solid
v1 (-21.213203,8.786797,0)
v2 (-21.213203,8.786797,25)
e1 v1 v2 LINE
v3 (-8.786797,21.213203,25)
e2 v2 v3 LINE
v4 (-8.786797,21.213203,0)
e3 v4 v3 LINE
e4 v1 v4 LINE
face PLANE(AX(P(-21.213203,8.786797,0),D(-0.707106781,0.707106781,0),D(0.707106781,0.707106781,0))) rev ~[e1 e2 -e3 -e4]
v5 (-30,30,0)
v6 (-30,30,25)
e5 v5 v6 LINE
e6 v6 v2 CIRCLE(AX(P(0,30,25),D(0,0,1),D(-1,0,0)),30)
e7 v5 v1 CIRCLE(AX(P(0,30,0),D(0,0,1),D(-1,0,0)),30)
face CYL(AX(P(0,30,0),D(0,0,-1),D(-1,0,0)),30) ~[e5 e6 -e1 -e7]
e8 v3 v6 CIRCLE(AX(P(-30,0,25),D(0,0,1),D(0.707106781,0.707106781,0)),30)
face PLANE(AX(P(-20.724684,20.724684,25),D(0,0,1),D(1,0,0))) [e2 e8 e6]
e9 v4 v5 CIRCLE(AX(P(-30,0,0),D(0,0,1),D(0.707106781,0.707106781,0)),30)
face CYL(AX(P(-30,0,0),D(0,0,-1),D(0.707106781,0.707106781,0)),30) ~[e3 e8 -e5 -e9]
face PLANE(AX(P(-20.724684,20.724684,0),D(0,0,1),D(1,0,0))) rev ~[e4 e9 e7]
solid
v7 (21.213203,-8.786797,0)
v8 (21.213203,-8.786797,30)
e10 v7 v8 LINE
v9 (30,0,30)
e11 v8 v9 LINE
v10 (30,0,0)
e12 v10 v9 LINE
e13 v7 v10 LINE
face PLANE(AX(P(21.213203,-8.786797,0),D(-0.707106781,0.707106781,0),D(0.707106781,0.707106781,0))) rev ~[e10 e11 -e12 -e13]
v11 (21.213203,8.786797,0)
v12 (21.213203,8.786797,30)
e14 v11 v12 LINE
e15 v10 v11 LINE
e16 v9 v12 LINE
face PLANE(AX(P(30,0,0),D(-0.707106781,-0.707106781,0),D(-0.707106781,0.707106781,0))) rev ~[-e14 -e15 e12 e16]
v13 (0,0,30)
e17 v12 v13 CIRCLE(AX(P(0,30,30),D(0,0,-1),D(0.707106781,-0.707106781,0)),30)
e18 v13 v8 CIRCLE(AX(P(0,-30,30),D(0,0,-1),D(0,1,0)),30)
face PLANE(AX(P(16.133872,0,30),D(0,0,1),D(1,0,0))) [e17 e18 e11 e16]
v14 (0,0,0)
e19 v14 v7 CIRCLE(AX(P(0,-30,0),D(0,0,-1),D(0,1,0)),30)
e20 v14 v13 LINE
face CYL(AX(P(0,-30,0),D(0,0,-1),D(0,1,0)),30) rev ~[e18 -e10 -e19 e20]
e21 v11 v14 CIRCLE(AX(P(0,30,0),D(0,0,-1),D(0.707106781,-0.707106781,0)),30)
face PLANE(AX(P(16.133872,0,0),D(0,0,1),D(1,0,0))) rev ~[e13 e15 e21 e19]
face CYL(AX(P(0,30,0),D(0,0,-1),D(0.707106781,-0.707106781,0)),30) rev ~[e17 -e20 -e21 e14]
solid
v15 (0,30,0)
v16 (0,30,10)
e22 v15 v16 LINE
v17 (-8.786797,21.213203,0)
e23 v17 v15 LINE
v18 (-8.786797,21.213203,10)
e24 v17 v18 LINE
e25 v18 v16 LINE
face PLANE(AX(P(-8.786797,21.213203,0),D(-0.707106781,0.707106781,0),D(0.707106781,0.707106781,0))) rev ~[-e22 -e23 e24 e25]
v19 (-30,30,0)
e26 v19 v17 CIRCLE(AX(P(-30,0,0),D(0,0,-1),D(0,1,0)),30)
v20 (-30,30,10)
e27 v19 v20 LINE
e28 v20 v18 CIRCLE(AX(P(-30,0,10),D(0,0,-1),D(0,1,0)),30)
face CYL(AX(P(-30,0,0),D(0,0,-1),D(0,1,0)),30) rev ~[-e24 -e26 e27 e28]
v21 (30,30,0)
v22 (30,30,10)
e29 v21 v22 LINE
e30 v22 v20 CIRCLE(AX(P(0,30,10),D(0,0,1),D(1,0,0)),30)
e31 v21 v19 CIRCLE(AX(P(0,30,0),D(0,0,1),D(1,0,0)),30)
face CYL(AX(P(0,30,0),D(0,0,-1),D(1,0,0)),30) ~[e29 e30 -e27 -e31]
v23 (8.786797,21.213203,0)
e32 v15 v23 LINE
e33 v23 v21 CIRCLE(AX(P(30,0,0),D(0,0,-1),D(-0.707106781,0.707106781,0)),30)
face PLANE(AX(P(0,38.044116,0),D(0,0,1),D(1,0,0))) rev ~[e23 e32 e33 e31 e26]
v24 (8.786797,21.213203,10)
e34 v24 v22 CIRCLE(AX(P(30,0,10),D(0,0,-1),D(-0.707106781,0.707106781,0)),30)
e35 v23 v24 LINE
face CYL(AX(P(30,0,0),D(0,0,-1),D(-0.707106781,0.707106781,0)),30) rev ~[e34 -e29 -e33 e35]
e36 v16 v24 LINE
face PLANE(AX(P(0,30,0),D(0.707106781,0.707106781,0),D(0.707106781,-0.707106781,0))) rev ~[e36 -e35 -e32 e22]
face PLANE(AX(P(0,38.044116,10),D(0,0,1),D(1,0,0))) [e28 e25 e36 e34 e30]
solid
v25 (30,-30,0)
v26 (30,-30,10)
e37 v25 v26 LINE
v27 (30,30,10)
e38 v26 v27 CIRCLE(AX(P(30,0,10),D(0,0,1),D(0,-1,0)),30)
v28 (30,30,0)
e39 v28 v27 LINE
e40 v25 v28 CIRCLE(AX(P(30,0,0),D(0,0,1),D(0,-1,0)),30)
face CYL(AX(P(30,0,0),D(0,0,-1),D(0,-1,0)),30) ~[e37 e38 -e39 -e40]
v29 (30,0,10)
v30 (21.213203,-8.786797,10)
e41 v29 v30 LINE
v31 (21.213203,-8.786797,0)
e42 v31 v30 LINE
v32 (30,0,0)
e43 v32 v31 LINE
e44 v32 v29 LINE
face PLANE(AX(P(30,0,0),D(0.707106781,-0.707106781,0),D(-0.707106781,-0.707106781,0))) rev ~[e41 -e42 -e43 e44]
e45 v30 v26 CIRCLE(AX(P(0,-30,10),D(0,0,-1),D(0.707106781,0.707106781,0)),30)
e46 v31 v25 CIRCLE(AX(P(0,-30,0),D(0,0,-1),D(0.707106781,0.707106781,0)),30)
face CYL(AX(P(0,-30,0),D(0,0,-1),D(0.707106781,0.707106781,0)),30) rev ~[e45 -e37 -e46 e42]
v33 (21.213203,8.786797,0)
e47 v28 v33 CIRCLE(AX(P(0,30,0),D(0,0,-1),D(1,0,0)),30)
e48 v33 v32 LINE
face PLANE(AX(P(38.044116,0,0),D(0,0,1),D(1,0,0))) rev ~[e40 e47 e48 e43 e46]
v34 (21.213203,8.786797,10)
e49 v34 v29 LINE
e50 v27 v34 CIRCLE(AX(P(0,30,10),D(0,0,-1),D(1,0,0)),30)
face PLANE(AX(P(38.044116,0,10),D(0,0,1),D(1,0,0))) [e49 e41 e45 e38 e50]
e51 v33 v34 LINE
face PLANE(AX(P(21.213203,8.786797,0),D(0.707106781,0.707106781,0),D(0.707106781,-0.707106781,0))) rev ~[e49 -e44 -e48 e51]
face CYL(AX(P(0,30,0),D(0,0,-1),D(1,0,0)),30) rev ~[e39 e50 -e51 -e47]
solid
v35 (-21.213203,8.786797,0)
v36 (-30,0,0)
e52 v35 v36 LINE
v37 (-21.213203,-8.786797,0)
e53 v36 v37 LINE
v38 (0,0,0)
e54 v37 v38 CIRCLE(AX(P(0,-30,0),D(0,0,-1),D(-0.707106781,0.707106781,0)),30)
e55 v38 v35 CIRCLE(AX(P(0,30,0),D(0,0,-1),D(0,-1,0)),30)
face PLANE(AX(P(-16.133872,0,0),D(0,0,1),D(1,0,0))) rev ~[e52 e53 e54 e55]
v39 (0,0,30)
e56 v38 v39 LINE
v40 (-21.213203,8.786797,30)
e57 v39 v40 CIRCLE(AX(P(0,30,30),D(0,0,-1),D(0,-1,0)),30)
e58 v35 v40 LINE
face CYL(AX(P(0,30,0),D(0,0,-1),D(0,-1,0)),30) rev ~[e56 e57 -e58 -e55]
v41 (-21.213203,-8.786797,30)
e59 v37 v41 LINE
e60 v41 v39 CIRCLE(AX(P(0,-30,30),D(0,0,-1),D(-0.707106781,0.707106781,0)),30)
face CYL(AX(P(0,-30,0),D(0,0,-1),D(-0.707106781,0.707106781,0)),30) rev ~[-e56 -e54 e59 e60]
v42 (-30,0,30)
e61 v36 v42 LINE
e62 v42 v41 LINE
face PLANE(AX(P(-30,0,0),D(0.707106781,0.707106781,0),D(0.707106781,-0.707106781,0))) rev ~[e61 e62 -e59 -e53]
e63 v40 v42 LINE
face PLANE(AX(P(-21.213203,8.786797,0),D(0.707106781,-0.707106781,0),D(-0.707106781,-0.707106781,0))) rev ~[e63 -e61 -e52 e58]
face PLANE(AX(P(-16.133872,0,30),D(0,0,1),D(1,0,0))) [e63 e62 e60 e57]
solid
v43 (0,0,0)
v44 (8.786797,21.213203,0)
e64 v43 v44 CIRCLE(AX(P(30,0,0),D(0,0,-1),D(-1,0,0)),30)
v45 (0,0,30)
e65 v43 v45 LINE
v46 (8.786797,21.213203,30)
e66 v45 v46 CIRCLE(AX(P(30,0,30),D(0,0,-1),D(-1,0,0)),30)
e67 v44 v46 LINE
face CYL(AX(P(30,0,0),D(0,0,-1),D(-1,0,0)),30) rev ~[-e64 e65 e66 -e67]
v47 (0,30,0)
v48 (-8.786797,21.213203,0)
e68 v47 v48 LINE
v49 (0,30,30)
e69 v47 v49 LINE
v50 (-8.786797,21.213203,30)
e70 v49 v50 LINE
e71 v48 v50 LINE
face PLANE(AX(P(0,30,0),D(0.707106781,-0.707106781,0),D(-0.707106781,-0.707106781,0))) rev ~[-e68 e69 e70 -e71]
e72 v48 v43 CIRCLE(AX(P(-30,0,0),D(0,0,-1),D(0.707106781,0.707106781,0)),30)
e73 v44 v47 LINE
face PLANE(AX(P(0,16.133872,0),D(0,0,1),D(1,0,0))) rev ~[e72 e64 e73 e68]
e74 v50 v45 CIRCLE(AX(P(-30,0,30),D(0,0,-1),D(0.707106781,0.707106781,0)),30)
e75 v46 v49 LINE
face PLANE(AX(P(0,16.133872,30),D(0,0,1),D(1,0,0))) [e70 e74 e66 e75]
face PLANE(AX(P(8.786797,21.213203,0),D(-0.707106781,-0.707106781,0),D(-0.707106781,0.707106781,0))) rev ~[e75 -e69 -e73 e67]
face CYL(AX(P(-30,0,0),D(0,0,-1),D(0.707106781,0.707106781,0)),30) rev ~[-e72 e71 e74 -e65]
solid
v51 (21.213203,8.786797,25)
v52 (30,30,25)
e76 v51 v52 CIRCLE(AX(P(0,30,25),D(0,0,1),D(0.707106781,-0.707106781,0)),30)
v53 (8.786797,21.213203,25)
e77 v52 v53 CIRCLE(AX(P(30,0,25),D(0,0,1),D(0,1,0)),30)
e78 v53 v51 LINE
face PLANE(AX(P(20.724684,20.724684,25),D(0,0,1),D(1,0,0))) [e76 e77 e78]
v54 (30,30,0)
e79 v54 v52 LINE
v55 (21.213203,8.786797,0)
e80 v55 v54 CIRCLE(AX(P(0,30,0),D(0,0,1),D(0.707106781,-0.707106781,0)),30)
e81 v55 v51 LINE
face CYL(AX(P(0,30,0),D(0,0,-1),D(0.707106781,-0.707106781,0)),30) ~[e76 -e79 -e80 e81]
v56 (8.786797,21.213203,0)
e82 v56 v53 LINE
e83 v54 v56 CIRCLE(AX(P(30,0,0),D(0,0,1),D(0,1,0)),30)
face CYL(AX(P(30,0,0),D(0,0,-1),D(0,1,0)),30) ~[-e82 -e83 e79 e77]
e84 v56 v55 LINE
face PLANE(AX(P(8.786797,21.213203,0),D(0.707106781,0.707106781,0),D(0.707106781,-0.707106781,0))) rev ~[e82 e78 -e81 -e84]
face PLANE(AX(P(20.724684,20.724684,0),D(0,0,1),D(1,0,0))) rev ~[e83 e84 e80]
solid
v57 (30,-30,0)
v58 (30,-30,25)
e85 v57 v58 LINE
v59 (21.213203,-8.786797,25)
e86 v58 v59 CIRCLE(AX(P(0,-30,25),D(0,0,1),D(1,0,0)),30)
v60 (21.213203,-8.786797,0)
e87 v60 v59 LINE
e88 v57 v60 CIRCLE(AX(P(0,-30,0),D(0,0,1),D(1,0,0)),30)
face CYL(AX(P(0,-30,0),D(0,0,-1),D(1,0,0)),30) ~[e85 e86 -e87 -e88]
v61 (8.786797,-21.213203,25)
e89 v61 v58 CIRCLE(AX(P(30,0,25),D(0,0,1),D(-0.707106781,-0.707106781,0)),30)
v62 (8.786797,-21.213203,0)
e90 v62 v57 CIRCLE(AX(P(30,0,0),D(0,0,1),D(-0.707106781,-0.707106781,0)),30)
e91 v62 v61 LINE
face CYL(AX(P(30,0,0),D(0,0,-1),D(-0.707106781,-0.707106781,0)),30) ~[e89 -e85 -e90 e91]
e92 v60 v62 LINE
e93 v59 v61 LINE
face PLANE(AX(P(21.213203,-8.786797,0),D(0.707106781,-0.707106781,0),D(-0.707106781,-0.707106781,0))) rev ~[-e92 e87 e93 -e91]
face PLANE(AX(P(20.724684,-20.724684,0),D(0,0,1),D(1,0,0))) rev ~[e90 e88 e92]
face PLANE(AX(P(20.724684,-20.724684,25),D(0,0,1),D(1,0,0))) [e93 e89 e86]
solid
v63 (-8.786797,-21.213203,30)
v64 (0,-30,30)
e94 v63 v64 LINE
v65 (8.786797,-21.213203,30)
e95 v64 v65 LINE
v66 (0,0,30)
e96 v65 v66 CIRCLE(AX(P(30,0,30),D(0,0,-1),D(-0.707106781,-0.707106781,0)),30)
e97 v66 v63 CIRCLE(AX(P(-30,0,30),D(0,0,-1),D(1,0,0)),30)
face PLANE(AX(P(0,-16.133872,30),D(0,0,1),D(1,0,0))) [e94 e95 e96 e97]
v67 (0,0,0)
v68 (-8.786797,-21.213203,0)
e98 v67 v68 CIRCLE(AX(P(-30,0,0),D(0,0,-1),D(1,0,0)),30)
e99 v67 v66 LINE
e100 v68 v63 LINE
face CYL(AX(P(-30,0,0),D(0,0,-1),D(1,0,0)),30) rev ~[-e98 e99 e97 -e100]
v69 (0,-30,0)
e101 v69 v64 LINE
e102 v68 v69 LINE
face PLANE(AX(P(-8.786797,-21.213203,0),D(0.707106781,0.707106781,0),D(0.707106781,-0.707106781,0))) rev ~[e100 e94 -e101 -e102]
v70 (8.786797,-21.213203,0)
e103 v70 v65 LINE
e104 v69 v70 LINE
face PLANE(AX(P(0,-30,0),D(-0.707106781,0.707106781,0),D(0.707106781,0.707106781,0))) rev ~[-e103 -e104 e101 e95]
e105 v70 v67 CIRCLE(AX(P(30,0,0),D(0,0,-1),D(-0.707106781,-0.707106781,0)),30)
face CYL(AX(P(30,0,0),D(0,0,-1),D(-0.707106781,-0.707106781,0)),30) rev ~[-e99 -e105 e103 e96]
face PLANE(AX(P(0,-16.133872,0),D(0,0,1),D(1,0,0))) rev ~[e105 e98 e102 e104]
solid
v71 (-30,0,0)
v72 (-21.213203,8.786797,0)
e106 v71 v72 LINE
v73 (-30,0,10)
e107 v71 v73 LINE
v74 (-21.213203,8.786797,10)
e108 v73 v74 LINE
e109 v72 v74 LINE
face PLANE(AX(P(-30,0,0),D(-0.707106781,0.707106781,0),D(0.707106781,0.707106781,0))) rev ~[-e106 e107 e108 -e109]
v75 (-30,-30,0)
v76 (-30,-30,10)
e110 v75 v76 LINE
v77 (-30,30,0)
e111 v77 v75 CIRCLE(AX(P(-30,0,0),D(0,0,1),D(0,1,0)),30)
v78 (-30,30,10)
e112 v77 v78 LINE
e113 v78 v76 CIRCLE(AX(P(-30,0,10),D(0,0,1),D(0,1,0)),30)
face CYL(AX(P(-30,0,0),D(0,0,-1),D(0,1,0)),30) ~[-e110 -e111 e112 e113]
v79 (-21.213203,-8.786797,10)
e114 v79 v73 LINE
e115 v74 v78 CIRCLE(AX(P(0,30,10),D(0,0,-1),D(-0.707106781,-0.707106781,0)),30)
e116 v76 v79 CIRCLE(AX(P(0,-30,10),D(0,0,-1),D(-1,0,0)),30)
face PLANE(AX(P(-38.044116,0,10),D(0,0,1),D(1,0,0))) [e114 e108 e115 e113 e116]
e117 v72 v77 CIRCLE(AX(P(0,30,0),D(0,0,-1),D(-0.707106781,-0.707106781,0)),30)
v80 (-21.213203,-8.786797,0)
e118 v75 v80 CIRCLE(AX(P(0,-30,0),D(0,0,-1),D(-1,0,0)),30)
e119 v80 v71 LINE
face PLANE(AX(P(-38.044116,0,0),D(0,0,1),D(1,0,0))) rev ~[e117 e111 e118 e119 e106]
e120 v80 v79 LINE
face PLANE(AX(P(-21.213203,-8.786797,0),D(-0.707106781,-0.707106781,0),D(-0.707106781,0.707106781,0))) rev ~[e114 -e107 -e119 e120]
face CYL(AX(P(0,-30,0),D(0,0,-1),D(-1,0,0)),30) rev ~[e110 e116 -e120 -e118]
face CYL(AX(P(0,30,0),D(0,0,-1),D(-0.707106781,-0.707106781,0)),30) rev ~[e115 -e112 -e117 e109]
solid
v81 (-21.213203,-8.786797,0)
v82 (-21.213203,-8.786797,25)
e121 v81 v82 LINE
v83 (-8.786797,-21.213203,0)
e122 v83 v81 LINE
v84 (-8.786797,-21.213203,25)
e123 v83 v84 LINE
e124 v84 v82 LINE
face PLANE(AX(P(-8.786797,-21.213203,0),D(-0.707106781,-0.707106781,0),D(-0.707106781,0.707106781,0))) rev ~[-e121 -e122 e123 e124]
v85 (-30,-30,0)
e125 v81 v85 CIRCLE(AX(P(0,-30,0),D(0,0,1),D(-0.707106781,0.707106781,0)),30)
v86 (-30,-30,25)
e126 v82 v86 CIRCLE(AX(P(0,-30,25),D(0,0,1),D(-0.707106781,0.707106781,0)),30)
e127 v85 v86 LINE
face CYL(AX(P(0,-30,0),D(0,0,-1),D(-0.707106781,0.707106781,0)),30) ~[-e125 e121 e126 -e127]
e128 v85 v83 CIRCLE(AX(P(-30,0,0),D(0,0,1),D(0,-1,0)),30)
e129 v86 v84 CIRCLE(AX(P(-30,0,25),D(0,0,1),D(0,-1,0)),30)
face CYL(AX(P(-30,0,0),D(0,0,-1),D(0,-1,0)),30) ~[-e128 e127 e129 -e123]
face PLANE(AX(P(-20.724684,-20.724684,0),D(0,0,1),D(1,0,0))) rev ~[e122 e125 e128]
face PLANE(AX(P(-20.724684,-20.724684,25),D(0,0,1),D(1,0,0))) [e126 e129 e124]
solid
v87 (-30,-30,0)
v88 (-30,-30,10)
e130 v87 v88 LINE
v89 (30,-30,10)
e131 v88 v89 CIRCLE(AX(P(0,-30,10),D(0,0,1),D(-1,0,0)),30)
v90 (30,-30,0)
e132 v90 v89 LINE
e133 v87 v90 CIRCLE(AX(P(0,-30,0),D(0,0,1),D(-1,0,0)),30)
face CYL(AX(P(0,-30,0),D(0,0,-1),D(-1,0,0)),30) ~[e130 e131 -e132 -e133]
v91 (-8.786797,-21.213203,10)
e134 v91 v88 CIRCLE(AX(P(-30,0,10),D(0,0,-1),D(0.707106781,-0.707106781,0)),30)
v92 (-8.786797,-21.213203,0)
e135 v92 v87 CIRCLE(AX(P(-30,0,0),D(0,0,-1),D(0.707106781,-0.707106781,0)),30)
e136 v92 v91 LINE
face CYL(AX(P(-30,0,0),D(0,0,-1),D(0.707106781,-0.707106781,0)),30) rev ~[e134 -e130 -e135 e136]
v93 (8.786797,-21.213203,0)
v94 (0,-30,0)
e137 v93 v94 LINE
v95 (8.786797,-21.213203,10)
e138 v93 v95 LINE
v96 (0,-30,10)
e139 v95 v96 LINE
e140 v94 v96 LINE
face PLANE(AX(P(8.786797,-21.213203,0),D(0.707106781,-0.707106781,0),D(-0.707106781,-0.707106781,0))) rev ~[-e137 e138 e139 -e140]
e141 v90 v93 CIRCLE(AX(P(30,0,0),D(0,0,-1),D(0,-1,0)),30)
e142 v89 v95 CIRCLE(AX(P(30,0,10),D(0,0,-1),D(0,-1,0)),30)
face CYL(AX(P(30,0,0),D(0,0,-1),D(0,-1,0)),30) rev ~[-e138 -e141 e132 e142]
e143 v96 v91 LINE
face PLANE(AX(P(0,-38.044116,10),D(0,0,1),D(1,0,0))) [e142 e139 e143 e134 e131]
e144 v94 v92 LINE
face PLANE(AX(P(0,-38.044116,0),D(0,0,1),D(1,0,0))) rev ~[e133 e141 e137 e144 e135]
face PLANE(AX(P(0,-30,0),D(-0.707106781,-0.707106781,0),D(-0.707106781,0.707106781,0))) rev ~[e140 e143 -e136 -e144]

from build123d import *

# Parameters (mm, degrees)
F1_DEPTH = 25
F2_DEPTH = 10
F3_DEPTH = 30


with BuildPart() as f1:
    # F0 (on Top) → F1 (new body)
    with BuildSketch(Plane.XY):
        with BuildLine():
            ThreePointArc((21.2132034356, 8.7867965644), (27.7163859753, 18.519497029), (30, 30))
            ThreePointArc((30, 30), (18.519497029, 27.7163859753), (8.7867965644, 21.2132034356))
            Line((8.7867965644, 21.2132034356), (21.2132034356, 8.7867965644))
        make_face()
    extrude(amount=F1_DEPTH)


with BuildPart() as f1b:
    # F0 (on Top) → F1, piece 2 (new body)
    with BuildSketch(Plane.XY):
        with BuildLine():
            ThreePointArc((8.7867965644, -21.2132034356), (18.519497029, -27.7163859753), (30, -30))
            ThreePointArc((30, -30), (27.7163859753, -18.519497029), (21.2132034356, -8.7867965644))
            Line((21.2132034356, -8.7867965644), (8.7867965644, -21.2132034356))
        make_face()
    extrude(amount=F1_DEPTH)


with BuildPart() as f1c:
    # F0 (on Top) → F1, piece 3 (new body)
    with BuildSketch(Plane.XY):
        with BuildLine():
            ThreePointArc((-8.7867965644, 21.2132034356), (-18.519497029, 27.7163859753), (-30, 30))
            ThreePointArc((-30, 30), (-27.7163859753, 18.519497029), (-21.2132034356, 8.7867965644))
            Line((-21.2132034356, 8.7867965644), (-8.7867965644, 21.2132034356))
        make_face()
    extrude(amount=F1_DEPTH)


with BuildPart() as f1d:
    # F0 (on Top) → F1, piece 4 (new body)
    with BuildSketch(Plane.XY):
        with BuildLine():
            ThreePointArc((-21.2132034356, -8.7867965644), (-27.7163859753, -18.519497029), (-30, -30))
            ThreePointArc((-30, -30), (-18.519497029, -27.7163859753), (-8.7867965644, -21.2132034356))
            Line((-8.7867965644, -21.2132034356), (-21.2132034356, -8.7867965644))
        make_face()
    extrude(amount=F1_DEPTH)


with BuildPart() as f2:
    # F0 (on Top) → F2 (new body)
    with BuildSketch(Plane.XY):
        with BuildLine():
            ThreePointArc((30, -30), (51.2132034356, -21.2132034356), (60, 0))
            ThreePointArc((60, 0), (51.2132034356, 21.2132034356), (30, 30))
            ThreePointArc((30, 30), (27.7163859753, 18.519497029), (21.2132034356, 8.7867965644))
            Line((21.2132034356, 8.7867965644), (30, 0))
            Line((30, 0), (21.2132034356, -8.7867965644))
            ThreePointArc((21.2132034356, -8.7867965644), (27.7163859753, -18.519497029), (30, -30))
        make_face()
    extrude(amount=F2_DEPTH)


with BuildPart() as f2b:
    # F0 (on Top) → F2, piece 2 (new body)
    with BuildSketch(Plane.XY):
        with BuildLine():
            ThreePointArc((8.7867965644, 21.2132034356), (18.519497029, 27.7163859753), (30, 30))
            ThreePointArc((30, 30), (0, 60), (-30, 30))
            ThreePointArc((-30, 30), (-18.519497029, 27.7163859753), (-8.7867965644, 21.2132034356))
            Line((-8.7867965644, 21.2132034356), (0, 30))
            Line((0, 30), (8.7867965644, 21.2132034356))
        make_face()
    extrude(amount=F2_DEPTH)


with BuildPart() as f2c:
    # F0 (on Top) → F2, piece 3 (new body)
    with BuildSketch(Plane.XY):
        with BuildLine():
            ThreePointArc((-30, -30), (0, -60), (30, -30))
            ThreePointArc((30, -30), (18.519497029, -27.7163859753), (8.7867965644, -21.2132034356))
            Line((8.7867965644, -21.2132034356), (0, -30))
            Line((0, -30), (-8.7867965644, -21.2132034356))
            ThreePointArc((-8.7867965644, -21.2132034356), (-18.519497029, -27.7163859753), (-30, -30))
        make_face()
    extrude(amount=F2_DEPTH)


with BuildPart() as f2d:
    # F0 (on Top) → F2, piece 4 (new body)
    with BuildSketch(Plane.XY):
        with BuildLine():
            ThreePointArc((-21.2132034356, 8.7867965644), (-27.7163859753, 18.519497029), (-30, 30))
            ThreePointArc((-30, 30), (-60, 0), (-30, -30))
            ThreePointArc((-30, -30), (-27.7163859753, -18.519497029), (-21.2132034356, -8.7867965644))
            Line((-21.2132034356, -8.7867965644), (-30, 0))
            Line((-30, 0), (-21.2132034356, 8.7867965644))
        make_face()
    extrude(amount=F2_DEPTH)


with BuildPart() as f3:
    # F0 (on Top) → F3 (new body)
    with BuildSketch(Plane.XY):
        with BuildLine():
            ThreePointArc((0, 0), (2.2836140247, 11.480502971), (8.7867965644, 21.2132034356))
            Line((8.7867965644, 21.2132034356), (0, 30))
            Line((0, 30), (-8.7867965644, 21.2132034356))
            ThreePointArc((-8.7867965644, 21.2132034356), (-2.2836140247, 11.480502971), (0, 0))
        make_face()
    extrude(amount=F3_DEPTH)


with BuildPart() as f3b:
    # F0 (on Top) → F3, piece 2 (new body)
    with BuildSketch(Plane.XY):
        with BuildLine():
            Line((0, -30), (8.7867965644, -21.2132034356))
            ThreePointArc((8.7867965644, -21.2132034356), (2.2836140247, -11.480502971), (0, 0))
            ThreePointArc((0, 0), (-2.2836140247, -11.480502971), (-8.7867965644, -21.2132034356))
            Line((-8.7867965644, -21.2132034356), (0, -30))
        make_face()
    extrude(amount=F3_DEPTH)


with BuildPart() as f3c:
    # F0 (on Top) → F3, piece 3 (new body)
    with BuildSketch(Plane.XY):
        with BuildLine():
            ThreePointArc((-21.2132034356, -8.7867965644), (-11.480502971, -2.2836140247), (0, 0))
            ThreePointArc((0, 0), (-11.480502971, 2.2836140247), (-21.2132034356, 8.7867965644))
            Line((-21.2132034356, 8.7867965644), (-30, 0))
            Line((-30, 0), (-21.2132034356, -8.7867965644))
        make_face()
    extrude(amount=F3_DEPTH)


with BuildPart() as f3d:
    # F0 (on Top) → F3, piece 4 (new body)
    with BuildSketch(Plane.XY):
        with BuildLine():
            Line((30, 0), (21.2132034356, 8.7867965644))
            ThreePointArc((21.2132034356, 8.7867965644), (11.480502971, 2.2836140247), (0, 0))
            ThreePointArc((0, 0), (11.480502971, -2.2836140247), (21.2132034356, -8.7867965644))
            Line((21.2132034356, -8.7867965644), (30, 0))
        make_face()
    extrude(amount=F3_DEPTH)


solid = Compound([f1.part, f1b.part, f1c.part, f1d.part, f2.part, f2b.part, f2c.part, f2d.part, f3.part, f3b.part, f3c.part, f3d.part])
